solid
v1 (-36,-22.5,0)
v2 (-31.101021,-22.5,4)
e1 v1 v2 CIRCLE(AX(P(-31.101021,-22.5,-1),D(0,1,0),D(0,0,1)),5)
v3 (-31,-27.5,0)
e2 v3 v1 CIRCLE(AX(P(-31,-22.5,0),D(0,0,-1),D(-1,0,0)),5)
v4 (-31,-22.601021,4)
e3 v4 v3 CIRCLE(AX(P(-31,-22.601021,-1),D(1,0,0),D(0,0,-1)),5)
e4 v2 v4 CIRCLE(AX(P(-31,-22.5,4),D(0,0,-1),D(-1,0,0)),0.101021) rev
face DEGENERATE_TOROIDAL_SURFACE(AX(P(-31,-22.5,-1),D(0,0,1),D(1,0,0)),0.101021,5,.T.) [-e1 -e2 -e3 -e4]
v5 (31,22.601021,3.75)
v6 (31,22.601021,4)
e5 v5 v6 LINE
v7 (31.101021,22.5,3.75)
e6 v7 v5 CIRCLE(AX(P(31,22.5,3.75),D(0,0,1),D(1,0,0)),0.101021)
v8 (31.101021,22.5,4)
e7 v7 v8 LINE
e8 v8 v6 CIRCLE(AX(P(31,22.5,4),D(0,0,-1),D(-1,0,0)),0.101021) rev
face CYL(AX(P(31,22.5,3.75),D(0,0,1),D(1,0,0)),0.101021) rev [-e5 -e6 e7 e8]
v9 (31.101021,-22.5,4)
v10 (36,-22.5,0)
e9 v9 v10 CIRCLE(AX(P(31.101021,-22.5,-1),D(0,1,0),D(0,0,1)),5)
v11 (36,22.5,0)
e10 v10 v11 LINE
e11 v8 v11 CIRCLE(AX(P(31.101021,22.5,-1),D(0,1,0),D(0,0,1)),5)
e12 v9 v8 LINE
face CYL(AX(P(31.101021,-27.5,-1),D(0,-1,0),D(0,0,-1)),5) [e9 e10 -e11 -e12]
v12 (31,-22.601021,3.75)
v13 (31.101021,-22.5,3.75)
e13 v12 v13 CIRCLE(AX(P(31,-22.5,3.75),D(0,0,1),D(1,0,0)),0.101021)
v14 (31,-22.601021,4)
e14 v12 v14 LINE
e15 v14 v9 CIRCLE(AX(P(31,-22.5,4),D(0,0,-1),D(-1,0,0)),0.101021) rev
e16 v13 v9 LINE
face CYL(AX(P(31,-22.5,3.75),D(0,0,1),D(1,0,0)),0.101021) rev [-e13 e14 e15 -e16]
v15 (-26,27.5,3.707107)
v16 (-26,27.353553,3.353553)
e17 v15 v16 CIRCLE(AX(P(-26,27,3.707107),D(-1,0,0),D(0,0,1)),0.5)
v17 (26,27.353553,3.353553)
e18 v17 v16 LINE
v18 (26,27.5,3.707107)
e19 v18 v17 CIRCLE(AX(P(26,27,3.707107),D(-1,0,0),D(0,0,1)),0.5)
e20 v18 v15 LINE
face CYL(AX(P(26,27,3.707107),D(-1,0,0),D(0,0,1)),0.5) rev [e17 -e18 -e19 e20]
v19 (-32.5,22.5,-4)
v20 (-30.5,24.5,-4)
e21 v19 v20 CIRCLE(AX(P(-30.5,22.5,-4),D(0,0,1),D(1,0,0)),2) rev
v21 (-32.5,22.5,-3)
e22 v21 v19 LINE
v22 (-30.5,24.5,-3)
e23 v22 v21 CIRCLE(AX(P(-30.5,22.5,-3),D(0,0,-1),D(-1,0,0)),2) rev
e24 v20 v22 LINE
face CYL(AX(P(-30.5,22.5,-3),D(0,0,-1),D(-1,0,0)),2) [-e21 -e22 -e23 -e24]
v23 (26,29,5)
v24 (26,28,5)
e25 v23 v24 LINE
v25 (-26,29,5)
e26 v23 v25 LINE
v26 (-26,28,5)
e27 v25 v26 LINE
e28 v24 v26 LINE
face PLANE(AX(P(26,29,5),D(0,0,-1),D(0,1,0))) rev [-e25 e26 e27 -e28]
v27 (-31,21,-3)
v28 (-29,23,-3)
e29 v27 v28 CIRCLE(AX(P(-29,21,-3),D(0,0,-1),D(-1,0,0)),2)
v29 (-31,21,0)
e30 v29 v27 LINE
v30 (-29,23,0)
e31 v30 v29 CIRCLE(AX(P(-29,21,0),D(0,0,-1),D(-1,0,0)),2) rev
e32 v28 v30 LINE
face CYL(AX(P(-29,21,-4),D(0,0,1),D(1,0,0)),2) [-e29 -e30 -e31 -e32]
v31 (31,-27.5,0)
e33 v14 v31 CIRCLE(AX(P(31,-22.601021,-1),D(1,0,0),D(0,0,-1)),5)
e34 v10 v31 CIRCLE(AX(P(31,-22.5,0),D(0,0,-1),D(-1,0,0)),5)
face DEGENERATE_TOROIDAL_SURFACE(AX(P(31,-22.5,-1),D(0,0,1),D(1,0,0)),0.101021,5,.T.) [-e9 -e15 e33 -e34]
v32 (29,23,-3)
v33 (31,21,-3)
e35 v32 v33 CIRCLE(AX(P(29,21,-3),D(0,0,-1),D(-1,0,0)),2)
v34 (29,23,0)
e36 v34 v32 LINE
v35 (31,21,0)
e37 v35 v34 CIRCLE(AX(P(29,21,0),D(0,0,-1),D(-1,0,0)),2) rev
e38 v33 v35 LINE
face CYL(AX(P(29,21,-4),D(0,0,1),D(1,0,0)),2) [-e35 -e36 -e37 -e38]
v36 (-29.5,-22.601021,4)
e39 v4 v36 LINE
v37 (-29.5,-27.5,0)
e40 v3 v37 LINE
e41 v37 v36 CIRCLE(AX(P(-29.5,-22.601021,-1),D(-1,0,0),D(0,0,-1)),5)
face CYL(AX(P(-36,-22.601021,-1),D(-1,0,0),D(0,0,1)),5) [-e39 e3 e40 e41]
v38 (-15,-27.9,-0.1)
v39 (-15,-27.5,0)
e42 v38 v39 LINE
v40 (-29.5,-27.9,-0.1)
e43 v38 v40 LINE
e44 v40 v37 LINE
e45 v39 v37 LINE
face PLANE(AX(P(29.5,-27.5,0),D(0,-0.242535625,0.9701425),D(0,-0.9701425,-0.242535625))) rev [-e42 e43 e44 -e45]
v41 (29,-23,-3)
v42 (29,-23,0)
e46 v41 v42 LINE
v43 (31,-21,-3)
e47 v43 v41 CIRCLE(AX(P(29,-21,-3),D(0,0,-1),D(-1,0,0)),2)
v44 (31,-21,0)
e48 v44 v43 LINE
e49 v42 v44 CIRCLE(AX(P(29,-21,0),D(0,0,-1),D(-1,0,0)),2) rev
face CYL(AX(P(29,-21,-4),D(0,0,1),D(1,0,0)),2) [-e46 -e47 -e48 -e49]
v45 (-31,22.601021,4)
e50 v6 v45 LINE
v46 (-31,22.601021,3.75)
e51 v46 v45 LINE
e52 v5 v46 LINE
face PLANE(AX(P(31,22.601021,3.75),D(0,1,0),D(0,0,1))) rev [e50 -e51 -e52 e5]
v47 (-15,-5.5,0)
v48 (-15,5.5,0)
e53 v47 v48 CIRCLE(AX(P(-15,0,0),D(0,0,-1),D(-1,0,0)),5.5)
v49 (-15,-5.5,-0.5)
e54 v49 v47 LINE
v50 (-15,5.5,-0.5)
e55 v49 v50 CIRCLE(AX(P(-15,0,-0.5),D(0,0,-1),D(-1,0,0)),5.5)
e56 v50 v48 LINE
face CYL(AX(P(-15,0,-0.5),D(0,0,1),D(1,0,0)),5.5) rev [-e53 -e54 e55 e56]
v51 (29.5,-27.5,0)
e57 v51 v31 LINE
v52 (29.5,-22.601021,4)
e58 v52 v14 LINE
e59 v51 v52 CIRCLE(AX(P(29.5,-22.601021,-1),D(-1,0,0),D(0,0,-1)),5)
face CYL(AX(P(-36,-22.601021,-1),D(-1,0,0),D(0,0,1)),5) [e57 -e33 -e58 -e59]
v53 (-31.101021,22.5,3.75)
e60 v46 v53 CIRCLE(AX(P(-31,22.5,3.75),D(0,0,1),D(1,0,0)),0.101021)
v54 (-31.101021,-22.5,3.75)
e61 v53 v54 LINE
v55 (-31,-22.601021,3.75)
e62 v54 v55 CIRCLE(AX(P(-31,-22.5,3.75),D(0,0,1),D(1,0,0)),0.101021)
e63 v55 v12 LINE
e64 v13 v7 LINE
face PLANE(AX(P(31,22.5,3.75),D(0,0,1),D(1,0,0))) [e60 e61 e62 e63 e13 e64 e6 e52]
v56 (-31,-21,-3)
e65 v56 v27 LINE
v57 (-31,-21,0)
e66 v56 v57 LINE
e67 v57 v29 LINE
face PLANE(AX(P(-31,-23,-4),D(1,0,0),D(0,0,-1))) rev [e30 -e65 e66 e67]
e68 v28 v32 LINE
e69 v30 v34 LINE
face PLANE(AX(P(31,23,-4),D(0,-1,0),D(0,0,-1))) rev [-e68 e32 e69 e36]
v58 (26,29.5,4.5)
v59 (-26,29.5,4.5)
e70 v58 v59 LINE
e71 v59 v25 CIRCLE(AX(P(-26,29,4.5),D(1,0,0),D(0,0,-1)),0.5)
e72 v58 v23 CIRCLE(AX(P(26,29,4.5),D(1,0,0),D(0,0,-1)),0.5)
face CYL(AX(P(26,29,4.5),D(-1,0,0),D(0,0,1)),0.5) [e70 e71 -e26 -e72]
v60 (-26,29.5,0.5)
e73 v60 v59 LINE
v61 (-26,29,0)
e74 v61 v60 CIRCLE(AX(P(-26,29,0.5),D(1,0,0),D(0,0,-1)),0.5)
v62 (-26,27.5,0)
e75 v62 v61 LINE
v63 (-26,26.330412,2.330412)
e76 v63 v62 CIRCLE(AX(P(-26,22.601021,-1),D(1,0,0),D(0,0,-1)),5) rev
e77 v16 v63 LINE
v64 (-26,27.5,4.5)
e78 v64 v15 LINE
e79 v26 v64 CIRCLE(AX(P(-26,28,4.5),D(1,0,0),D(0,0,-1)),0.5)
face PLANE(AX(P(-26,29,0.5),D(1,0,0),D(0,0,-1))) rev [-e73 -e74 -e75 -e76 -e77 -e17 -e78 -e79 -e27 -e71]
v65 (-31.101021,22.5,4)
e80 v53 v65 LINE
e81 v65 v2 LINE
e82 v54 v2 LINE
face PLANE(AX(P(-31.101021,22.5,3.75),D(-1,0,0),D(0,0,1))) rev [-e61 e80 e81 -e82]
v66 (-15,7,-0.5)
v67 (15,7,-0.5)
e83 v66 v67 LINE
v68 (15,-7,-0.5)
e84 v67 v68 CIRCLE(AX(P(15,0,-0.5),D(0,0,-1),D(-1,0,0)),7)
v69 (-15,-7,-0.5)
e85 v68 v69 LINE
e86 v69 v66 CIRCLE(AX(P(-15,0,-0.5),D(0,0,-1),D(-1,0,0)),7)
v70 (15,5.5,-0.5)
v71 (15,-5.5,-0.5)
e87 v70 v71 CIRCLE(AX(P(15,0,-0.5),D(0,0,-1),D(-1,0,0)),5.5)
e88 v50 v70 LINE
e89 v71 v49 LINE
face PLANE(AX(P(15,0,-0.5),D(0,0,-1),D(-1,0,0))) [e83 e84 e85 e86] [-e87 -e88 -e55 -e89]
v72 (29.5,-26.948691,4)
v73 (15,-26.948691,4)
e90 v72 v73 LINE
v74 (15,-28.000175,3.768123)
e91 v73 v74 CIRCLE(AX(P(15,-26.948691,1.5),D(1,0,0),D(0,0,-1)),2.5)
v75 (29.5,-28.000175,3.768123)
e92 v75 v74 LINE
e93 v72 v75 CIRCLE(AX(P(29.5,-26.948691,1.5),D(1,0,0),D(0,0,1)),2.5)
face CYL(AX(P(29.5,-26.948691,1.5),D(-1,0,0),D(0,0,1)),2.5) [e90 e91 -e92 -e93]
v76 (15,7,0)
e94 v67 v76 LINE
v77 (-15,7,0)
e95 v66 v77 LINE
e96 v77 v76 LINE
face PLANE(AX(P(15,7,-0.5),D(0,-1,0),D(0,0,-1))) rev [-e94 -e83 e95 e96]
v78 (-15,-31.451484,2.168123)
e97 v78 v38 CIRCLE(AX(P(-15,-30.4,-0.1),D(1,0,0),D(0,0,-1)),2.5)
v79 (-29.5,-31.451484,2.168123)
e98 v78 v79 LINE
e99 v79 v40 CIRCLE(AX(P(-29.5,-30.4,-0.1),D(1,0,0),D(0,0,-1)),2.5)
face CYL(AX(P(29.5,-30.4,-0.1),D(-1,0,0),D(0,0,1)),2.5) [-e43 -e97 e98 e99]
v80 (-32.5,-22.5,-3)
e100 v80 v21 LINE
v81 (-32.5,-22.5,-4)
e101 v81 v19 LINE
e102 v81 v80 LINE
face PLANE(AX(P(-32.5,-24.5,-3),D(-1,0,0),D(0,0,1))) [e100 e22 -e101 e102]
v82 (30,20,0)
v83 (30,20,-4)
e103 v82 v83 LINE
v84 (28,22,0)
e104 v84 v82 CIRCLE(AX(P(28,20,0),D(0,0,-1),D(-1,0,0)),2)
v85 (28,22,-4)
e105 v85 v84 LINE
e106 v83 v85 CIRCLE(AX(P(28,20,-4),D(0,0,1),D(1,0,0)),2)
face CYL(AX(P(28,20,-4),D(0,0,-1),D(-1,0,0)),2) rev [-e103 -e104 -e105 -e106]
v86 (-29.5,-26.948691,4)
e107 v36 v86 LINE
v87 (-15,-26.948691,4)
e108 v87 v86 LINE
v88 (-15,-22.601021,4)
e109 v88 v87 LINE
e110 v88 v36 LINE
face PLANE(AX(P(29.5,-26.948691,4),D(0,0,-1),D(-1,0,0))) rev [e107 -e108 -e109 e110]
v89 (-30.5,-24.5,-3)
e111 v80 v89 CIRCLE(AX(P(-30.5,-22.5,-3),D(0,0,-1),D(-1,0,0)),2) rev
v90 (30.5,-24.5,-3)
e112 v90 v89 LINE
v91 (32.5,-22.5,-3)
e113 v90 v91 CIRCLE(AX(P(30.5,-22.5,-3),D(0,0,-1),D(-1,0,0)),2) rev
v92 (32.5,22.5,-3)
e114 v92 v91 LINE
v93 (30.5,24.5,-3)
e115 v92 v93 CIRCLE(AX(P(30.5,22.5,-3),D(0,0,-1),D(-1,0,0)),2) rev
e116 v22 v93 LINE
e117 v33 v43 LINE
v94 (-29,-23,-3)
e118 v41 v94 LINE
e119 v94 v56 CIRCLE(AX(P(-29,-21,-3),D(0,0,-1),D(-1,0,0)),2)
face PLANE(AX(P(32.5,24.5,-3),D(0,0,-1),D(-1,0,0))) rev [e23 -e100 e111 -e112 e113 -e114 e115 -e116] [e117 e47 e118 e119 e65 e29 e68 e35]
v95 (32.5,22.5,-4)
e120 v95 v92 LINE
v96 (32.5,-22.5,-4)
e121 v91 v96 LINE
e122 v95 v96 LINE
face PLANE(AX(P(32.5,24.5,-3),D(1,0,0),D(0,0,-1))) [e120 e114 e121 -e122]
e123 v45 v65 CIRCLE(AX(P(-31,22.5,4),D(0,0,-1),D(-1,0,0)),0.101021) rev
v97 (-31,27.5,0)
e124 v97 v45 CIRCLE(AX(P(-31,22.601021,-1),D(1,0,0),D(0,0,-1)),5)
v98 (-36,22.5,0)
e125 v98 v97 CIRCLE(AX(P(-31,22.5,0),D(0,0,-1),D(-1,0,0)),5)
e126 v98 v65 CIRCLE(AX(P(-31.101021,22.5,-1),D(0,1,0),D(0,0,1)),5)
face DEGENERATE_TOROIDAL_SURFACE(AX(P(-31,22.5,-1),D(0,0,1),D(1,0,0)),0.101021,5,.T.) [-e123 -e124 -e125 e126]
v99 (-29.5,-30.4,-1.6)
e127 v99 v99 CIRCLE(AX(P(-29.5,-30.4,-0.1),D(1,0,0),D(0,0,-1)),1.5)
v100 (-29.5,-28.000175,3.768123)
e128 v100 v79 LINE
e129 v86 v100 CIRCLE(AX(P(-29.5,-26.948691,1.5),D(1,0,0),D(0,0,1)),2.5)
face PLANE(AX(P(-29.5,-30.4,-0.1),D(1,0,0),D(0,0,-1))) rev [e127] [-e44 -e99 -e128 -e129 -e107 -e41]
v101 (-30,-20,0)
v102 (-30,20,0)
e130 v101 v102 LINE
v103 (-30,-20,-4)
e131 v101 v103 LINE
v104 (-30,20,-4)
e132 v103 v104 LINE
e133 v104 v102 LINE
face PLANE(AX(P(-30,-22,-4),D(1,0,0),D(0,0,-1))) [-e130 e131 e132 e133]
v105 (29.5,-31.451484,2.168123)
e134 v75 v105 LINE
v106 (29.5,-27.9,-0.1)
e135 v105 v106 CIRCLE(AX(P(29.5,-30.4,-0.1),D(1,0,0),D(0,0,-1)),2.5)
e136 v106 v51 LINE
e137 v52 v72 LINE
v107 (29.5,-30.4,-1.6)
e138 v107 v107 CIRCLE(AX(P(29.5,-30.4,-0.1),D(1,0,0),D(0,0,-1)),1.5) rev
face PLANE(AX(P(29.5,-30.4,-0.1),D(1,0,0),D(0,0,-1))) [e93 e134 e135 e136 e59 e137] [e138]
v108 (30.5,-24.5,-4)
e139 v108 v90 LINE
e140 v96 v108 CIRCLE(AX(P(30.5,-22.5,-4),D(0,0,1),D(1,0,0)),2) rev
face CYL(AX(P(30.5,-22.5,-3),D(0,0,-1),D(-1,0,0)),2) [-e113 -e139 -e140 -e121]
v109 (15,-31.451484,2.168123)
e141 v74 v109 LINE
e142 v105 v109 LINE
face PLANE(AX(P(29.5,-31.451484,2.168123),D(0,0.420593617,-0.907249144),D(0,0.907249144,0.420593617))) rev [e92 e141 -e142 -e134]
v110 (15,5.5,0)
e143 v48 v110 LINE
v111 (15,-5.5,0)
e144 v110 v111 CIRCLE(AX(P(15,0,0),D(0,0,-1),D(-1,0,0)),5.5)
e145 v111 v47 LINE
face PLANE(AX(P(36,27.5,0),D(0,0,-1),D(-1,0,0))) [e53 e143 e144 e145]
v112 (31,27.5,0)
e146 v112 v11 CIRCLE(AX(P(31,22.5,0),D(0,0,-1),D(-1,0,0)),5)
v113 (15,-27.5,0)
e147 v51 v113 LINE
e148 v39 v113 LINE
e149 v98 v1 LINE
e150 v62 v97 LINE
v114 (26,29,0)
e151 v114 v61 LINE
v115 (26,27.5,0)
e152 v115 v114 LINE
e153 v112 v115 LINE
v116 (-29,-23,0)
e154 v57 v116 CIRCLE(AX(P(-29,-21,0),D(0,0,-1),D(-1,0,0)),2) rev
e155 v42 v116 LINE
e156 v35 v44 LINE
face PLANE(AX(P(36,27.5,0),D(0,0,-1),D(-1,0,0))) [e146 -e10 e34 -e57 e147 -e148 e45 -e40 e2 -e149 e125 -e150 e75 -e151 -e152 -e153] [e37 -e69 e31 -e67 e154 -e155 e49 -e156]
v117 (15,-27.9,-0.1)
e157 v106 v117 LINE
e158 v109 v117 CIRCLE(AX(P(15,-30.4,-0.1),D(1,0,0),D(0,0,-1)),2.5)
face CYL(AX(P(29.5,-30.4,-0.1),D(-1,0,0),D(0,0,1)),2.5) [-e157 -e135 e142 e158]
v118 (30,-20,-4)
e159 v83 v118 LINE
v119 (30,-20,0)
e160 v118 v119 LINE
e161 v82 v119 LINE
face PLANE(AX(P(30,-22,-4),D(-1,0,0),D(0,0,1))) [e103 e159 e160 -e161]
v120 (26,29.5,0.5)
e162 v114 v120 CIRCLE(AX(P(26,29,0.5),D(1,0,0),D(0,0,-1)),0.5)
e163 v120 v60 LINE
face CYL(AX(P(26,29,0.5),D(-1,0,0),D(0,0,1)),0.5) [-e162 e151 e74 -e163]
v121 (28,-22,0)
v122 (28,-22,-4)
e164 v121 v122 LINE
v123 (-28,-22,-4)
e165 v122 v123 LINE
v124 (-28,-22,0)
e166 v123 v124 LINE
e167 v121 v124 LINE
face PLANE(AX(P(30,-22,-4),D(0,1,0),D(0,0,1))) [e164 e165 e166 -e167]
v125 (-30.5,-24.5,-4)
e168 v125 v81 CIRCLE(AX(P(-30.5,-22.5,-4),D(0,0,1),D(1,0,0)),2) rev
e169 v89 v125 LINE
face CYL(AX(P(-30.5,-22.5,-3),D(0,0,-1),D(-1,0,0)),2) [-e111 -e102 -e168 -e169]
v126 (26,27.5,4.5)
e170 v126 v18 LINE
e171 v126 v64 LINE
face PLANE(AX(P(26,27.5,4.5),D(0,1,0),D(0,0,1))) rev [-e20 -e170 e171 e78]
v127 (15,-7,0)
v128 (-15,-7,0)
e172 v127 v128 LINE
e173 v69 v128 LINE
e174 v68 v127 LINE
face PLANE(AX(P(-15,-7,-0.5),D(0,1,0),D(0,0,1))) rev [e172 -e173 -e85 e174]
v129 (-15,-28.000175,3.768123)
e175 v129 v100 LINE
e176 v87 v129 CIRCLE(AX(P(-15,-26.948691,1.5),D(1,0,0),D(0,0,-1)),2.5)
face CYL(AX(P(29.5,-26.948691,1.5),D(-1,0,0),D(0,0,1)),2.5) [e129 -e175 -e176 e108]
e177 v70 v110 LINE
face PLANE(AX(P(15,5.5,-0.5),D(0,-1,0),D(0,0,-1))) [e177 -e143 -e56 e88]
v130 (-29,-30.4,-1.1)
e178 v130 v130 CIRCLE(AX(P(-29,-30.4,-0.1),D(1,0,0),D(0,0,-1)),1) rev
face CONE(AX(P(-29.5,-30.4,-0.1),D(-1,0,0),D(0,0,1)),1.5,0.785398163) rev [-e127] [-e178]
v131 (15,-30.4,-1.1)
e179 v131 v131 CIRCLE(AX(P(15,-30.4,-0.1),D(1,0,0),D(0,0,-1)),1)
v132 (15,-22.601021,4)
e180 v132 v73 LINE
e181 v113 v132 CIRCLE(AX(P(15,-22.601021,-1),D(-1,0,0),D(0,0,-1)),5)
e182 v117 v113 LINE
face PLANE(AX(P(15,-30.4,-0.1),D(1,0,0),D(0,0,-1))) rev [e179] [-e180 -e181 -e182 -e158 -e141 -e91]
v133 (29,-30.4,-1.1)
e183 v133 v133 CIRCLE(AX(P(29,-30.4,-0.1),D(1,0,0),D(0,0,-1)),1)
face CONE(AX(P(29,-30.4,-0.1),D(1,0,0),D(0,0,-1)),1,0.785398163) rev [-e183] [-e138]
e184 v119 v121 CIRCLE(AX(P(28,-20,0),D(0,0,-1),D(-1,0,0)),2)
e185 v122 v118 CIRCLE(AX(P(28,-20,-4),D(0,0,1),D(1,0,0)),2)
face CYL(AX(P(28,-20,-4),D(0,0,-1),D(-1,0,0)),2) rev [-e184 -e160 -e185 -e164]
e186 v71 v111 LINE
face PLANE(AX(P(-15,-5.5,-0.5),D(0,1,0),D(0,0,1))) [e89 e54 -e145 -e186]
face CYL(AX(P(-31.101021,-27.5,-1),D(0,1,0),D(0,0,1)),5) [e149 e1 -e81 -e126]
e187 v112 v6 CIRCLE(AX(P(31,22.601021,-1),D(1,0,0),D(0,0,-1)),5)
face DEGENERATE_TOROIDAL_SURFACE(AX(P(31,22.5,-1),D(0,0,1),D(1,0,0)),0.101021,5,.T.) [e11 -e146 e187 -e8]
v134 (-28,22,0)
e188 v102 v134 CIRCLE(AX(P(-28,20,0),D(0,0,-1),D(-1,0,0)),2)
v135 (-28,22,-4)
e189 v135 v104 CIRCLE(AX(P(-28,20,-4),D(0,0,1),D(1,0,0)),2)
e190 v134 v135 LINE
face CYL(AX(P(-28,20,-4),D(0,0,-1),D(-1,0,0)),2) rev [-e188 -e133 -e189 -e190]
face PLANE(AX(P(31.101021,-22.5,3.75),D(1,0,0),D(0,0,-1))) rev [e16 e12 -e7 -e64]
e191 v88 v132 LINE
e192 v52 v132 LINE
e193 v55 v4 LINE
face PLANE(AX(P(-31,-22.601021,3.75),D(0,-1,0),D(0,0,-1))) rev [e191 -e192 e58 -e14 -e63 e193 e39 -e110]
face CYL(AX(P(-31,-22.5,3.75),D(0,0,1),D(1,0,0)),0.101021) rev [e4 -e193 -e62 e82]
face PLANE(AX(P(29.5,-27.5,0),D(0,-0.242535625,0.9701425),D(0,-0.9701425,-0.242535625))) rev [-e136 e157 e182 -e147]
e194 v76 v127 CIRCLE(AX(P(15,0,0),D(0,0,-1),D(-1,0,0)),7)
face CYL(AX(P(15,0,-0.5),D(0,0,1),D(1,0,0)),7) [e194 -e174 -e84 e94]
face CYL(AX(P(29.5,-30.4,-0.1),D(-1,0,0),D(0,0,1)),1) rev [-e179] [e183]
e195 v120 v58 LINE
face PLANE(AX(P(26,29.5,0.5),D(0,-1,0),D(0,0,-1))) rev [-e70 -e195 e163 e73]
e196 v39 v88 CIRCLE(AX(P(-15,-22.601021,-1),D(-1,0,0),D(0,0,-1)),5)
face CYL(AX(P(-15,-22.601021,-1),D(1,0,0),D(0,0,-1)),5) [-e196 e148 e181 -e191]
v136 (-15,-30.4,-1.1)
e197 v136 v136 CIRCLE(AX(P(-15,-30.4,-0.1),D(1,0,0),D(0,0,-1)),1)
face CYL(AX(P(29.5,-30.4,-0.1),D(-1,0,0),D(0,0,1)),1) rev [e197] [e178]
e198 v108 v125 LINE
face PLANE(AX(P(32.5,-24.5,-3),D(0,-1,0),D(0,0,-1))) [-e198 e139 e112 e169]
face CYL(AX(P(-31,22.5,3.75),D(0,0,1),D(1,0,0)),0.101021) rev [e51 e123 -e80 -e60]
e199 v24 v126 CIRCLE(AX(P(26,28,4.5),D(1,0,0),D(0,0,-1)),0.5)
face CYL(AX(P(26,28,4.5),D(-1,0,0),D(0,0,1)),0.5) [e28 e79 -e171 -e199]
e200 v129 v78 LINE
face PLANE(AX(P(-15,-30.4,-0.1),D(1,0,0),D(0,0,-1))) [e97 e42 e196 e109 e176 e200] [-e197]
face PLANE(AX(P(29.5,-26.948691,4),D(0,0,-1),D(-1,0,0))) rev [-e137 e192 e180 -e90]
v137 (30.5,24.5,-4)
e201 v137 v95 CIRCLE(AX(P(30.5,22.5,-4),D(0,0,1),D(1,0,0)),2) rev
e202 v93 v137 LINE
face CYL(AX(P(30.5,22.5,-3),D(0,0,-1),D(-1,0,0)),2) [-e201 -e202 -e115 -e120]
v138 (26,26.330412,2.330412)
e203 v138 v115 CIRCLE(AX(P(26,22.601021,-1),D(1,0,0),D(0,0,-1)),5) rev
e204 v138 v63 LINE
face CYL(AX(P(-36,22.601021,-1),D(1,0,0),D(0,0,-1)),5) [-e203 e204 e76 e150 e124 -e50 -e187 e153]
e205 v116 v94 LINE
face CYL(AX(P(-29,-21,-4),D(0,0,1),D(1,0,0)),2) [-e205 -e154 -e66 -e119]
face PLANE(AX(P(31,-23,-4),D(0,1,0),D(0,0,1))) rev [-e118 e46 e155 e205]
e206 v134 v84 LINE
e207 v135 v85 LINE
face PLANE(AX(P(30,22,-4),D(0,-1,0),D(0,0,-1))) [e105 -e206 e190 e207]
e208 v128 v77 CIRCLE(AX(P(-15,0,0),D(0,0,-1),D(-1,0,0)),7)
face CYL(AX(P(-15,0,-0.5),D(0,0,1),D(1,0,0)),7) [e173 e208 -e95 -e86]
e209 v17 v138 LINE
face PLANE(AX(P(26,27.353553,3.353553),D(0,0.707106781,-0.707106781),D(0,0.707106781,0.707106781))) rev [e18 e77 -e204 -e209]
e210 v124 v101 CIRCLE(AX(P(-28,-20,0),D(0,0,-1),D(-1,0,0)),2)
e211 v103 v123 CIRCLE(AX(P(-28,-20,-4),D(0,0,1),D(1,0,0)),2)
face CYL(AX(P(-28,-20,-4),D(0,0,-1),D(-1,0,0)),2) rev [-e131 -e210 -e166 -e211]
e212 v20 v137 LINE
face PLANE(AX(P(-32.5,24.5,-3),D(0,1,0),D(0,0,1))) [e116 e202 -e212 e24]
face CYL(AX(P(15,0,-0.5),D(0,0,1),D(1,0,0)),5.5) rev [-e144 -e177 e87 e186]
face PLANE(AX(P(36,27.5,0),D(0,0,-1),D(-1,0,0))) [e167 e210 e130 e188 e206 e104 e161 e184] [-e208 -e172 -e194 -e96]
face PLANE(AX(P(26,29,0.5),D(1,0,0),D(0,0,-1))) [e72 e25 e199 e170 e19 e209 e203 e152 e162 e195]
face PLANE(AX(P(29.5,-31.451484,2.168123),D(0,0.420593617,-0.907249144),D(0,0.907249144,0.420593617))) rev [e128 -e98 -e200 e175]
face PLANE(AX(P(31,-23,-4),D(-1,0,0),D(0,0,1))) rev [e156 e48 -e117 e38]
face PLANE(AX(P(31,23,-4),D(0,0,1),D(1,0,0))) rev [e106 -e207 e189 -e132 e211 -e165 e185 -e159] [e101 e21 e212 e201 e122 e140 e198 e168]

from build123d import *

# Parameters (mm, degrees)
SKETCH1_W           = 72
SKETCH1_H           = 55
BOSS_EXTRUDE1_DEPTH = 4
FILLET3_R           = 5
FILLET4_R           = 5
CUT_EXTRUDE1_DEPTH  = 0.25
SKETCH3_W           = 62
SKETCH3_H           = 46
SKETCH3_W_2         = 60
SKETCH3_H_2         = 44
BOSS_EXTRUDE2_DEPTH = 4
SKETCH4_W           = 65
SKETCH4_H           = 49
SKETCH4_W_2         = 60
SKETCH4_H_2         = 44
BOSS_EXTRUDE3_DEPTH = 1
FILLET2_R           = 2
BOSS_EXTRUDE4_DEPTH = 0.5
BOSS_EXTRUDE5_DEPTH = 26
SKETCH7_R           = 1
BOSS_EXTRUDE6_DEPTH = 29.5
CUT_EXTRUDE2_DEPTH  = 15
CHAMFER1_SIZE       = 0.5


with BuildPart() as part:
    # Sketch1 → Boss-Extrude1 (new body)
    with BuildSketch(Plane.XY):
        Rectangle(SKETCH1_W, SKETCH1_H)
    extrude(amount=BOSS_EXTRUDE1_DEPTH)

    # Fillet3
    fillet3_edges = [part.edges().sort_by_distance(p)[0] for p in [
        (36, -27.5, 2),
        (-36, -27.5, 2),
        (-36, 27.5, 2),
        (36, 27.5, 2),
    ]]
    fillet(fillet3_edges, radius=FILLET3_R)

    # Fillet4
    # the kernel refuses this fillet: 5 mm, written as the material it takes off along each edge
    with BuildSketch(Plane(origin=(31, 22.5, 4), x_dir=(1, 0, 0), z_dir=(0, -1, 0))) as fillet4_piece_1:
        with BuildLine():
            CenterArc((0.101020514, -5), FILLET4_R, 11.536959033, 78.463040967)
            Line((5, -4), (5.09797959, -3.98))
            ThreePointArc((5.09797959, -3.98), (5.1, -2), (5.1, 0))
            Line((5.1, 0), (5, 0.1))
            Line((5, 0.1), (0.101020514, 0.1))
            Line((0.101020514, 0.1), (0.101020514, 0))
        make_face()
    revolve(axis=Axis((31, 22.5, 4), (0, 0, 1)), revolution_arc=90, mode=Mode.SUBTRACT)
    with BuildSketch(Plane(origin=(36, -22.5, 4), x_dir=(-1, 0, 0), z_dir=(0, 1, 0)), Plane(origin=(-36, 22.5, 4), x_dir=(1, 0, 0), z_dir=(0, -1, 0))) as fillet4_piece_2:
        with BuildLine():
            CenterArc((4.898979486, -5), FILLET4_R, 90, 78.463040967)
            Line((0, -4), (-0.09797959, -3.98))
            ThreePointArc((-0.09797959, -3.98), (-0.1, -2), (-0.1, 0))
            Line((-0.1, 0), (0, 0.1))
            Line((0, 0.1), (4.898979486, 0.1))
            Line((4.898979486, 0.1), (4.898979486, 0))
        make_face()
    extrude(amount=45, mode=Mode.SUBTRACT)
    with BuildSketch(Plane(origin=(31, -22.5, 4), x_dir=(0, -1, 0), z_dir=(-1, 0, 0))) as fillet4_piece_3:
        with BuildLine():
            CenterArc((0.101020514, -5), FILLET4_R, 11.536959033, 78.463040967)
            Line((0.101020514, 0), (0.101020514, 0.1))
            Line((0.101020514, 0.1), (5, 0.1))
            Line((5, 0.1), (5.1, 0))
            ThreePointArc((5.1, 0), (5.1, -2), (5.09797959, -3.98))
            Line((5.09797959, -3.98), (5, -4))
        make_face()
    revolve(axis=Axis((31, -22.5, 4), (0, 0, 1)), revolution_arc=90, mode=Mode.SUBTRACT)
    with BuildSketch(Plane(origin=(-31, -27.5, 4), x_dir=(0, 1.564970375511121e-12, -1.0), z_dir=(1, 0, 0))) as fillet4_piece_4:
        with BuildLine():
            CenterArc((5, 4.898979486), FILLET4_R, 180, 78.463040967)
            Line((0, 4.898979486), (-0.1, 4.898979486))
            Line((-0.1, 4.898979486), (-0.1, 0))
            Line((-0.1, 0), (0, -0.1))
            ThreePointArc((0, -0.1), (2, -0.1), (3.98, -0.09797959))
            Line((3.98, -0.09797959), (4, 0))
        make_face()
    extrude(amount=62, mode=Mode.SUBTRACT)
    with BuildSketch(Plane(origin=(-31, -22.5, 4), x_dir=(0, -1, 0), z_dir=(1, 0, 0))) as fillet4_piece_5:
        with BuildLine():
            CenterArc((0.101020514, 5), FILLET4_R, 270, 78.463040967)
            Line((0.101020514, 0), (0.101020514, -0.1))
            Line((0.101020514, -0.1), (5, -0.1))
            Line((5, -0.1), (5.1, 0))
            ThreePointArc((5.1, 0), (5.1, 2), (5.09797959, 3.98))
            Line((5.09797959, 3.98), (5, 4))
        make_face()
    revolve(axis=Axis((-31, -22.5, 4), (0, 0, -1)), revolution_arc=90, mode=Mode.SUBTRACT)
    with BuildSketch(Plane(origin=(-31, 22.5, 4), x_dir=(0, 1, 0), z_dir=(1, 0, 0))) as fillet4_piece_6:
        with BuildLine():
            CenterArc((0.101020514, -5), FILLET4_R, 11.536959033, 78.463040967)
            Line((5, -4), (5.09797959, -3.98))
            ThreePointArc((5.09797959, -3.98), (5.1, -2), (5.1, 0))
            Line((5.1, 0), (5, 0.1))
            Line((5, 0.1), (0.101020514, 0.1))
            Line((0.101020514, 0.1), (0.101020514, 0))
        make_face()
    revolve(axis=Axis((-31, 22.5, 4), (0, 0, 1)), revolution_arc=90, mode=Mode.SUBTRACT)
    with BuildSketch(Plane(origin=(31, 27.5, 4), x_dir=(0, -1, 0), z_dir=(-1, 0, 0))) as fillet4_piece_7:
        with BuildLine():
            CenterArc((4.898979486, -5), FILLET4_R, 90, 78.463040967)
            Line((0, -4), (-0.09797959, -3.98))
            ThreePointArc((-0.09797959, -3.98), (-0.1, -2), (-0.1, 0))
            Line((-0.1, 0), (0, 0.1))
            Line((0, 0.1), (4.898979486, 0.1))
            Line((4.898979486, 0.1), (4.898979486, 0))
        make_face()
    extrude(amount=62, mode=Mode.SUBTRACT)

    # Sketch2 → Cut-Extrude1 (cut)
    with BuildSketch(Plane.XY.offset(4)):
        with BuildLine():
            Line((31.101020514, -22.5), (31.101020514, 22.5))
            ThreePointArc((31.101020514, 22.5), (31.071432291, 22.571432291), (31, 22.601020514))
            Line((31, 22.601020514), (-31, 22.601020514))
            ThreePointArc((-31, 22.601020514), (-31.071432291, 22.571432291), (-31.101020514, 22.5))
            Line((-31.101020514, 22.5), (-31.101020514, -22.5))
            ThreePointArc((-31.101020514, -22.5), (-31.071432291, -22.571432291), (-31, -22.601020514))
            Line((-31, -22.601020514), (31, -22.601020514))
            ThreePointArc((31, -22.601020514), (31.071432291, -22.571432291), (31.101020514, -22.5))
        make_face()
    extrude(amount=-CUT_EXTRUDE1_DEPTH, mode=Mode.SUBTRACT)

    # Sketch3 → Boss-Extrude2 (add)
    with BuildSketch(Plane(origin=(0, 0, 0), x_dir=(-1, 0, 0), z_dir=(0, 0, -1))):
        Rectangle(SKETCH3_W, SKETCH3_H)
        Rectangle(SKETCH3_W_2, SKETCH3_H_2, mode=Mode.SUBTRACT)
    extrude(amount=BOSS_EXTRUDE2_DEPTH)

    # Sketch4 → Boss-Extrude3 (add)
    with BuildSketch(Plane(origin=(0, 0, -4), x_dir=(-1, 0, 0), z_dir=(0, 0, -1))):
        Rectangle(SKETCH4_W, SKETCH4_H)
        Rectangle(SKETCH4_W_2, SKETCH4_H_2, mode=Mode.SUBTRACT)
    extrude(amount=-BOSS_EXTRUDE3_DEPTH)

    # Fillet2
    fillet2_edges = [part.edges().sort_by_distance(p)[0] for p in [
        (31, 23, -1.5),
        (-31, 23, -1.5),
        (-31, -23, -1.5),
        (31, -23, -1.5),
        (32.5, 24.5, -3.5),
        (-32.5, 24.5, -3.5),
        (-32.5, -24.5, -3.5),
        (32.5, -24.5, -3.5),
        (-30, 22, -2),
        (30, 22, -2),
        (30, -22, -2),
        (-30, -22, -2),
    ]]
    fillet(fillet2_edges, radius=FILLET2_R)

    # Sketch5 → Boss-Extrude4 (add)
    with BuildSketch(Plane(origin=(0, 0, 0), x_dir=(-1, 0, 0), z_dir=(0, 0, -1))):
        with BuildLine():
            Line((-15, 7), (15, 7))
            ThreePointArc((15, 7), (22, 0), (15, -7))
            Line((15, -7), (-15, -7))
            ThreePointArc((-15, -7), (-22, 0), (-15, 7))
        make_face()
        with BuildLine():
            Line((-15, 5.5), (15, 5.5))
            ThreePointArc((15, 5.5), (20.5, 0), (15, -5.5))
            Line((15, -5.5), (-15, -5.5))
            ThreePointArc((-15, -5.5), (-20.5, 0), (-15, 5.5))
        make_face(mode=Mode.SUBTRACT)
    extrude(amount=BOSS_EXTRUDE4_DEPTH)

    # Sketch6 → Boss-Extrude5 (add, symmetric)
    with BuildSketch(Plane(origin=(0, 0, 0), x_dir=(0, 0, -1), z_dir=(1, 0, 0))):
        with BuildLine():
            Line((0, 27.5), (0, 29))
            ThreePointArc((0, 29), (-0.146446609, 29.353553391), (-0.5, 29.5))
            Line((-0.5, 29.5), (-4.5, 29.5))
            ThreePointArc((-4.5, 29.5), (-4.853553391, 29.353553391), (-5, 29))
            Line((-5, 29), (-5, 28))
            ThreePointArc((-5, 28), (-4.853553391, 27.646446609), (-4.5, 27.5))
            Line((-4.5, 27.5), (-3.707106781, 27.5))
            ThreePointArc((-3.707106781, 27.5), (-3.515765065, 27.461939766), (-3.353553391, 27.353553391))
            Line((-3.353553391, 27.353553391), (-1.948480403, 25.948480403))
            Line((-1.948480403, 25.948480403), (0, 25.948480403))
            Line((0, 25.948480403), (0, 27.5))
        make_face()
    extrude(amount=BOSS_EXTRUDE5_DEPTH, both=True)

    # Sketch7 → Boss-Extrude6 (add, symmetric)
    with BuildSketch(Plane(origin=(0, 0, 0), x_dir=(0, 0, -1), z_dir=(1, 0, 0))):
        with BuildLine():
            Line((-2.16812286, -31.451484043), (-3.76812286, -28.00017482))
            ThreePointArc((-3.76812286, -28.00017482), (-3.941342576, -27.487064649), (-4, -26.948690777))
            Line((-4, -26.948690777), (-4, -22.601020514))
            ThreePointArc((-4, -22.601020514), (-2.872983346, -25.763298175), (0, -27.5))
            Line((0, -27.5), (0.1, -27.9))
            ThreePointArc((0.1, -27.9), (2.206977706, -31.745602076), (-2.16812286, -31.451484043))
        make_face()
        with Locations((0.1, -30.4)):
            Circle(SKETCH7_R, mode=Mode.SUBTRACT)
    extrude(amount=BOSS_EXTRUDE6_DEPTH, both=True)

    # Sketch8 → Cut-Extrude2 (cut, symmetric)
    with BuildSketch(Plane(origin=(0, 0, 0), x_dir=(0, 0, -1), z_dir=(1, 0, 0))):
        with BuildLine():
            Line((0.1, -27.9), (0, -27.5))
            ThreePointArc((0, -27.5), (-2.872983346, -25.763298175), (-4, -22.601020514))
            Line((-4, -22.601020514), (-4, -26.948690777))
            ThreePointArc((-4, -26.948690777), (-3.941342576, -27.487064649), (-3.76812286, -28.00017482))
            Line((-3.76812286, -28.00017482), (-2.16812286, -31.451484043))
            ThreePointArc((-2.16812286, -31.451484043), (2.206977706, -31.745602076), (0.1, -27.9))
        make_face()
    extrude(amount=CUT_EXTRUDE2_DEPTH, both=True, mode=Mode.SUBTRACT)

    # Chamfer1
    chamfer1_edges = [part.edges().sort_by_distance(p)[0] for p in [
        (-29.5, -30.4, 0.9),
        (29.5, -30.4, 0.9),
    ]]
    chamfer(chamfer1_edges, length=CHAMFER1_SIZE)


solid = part.part
